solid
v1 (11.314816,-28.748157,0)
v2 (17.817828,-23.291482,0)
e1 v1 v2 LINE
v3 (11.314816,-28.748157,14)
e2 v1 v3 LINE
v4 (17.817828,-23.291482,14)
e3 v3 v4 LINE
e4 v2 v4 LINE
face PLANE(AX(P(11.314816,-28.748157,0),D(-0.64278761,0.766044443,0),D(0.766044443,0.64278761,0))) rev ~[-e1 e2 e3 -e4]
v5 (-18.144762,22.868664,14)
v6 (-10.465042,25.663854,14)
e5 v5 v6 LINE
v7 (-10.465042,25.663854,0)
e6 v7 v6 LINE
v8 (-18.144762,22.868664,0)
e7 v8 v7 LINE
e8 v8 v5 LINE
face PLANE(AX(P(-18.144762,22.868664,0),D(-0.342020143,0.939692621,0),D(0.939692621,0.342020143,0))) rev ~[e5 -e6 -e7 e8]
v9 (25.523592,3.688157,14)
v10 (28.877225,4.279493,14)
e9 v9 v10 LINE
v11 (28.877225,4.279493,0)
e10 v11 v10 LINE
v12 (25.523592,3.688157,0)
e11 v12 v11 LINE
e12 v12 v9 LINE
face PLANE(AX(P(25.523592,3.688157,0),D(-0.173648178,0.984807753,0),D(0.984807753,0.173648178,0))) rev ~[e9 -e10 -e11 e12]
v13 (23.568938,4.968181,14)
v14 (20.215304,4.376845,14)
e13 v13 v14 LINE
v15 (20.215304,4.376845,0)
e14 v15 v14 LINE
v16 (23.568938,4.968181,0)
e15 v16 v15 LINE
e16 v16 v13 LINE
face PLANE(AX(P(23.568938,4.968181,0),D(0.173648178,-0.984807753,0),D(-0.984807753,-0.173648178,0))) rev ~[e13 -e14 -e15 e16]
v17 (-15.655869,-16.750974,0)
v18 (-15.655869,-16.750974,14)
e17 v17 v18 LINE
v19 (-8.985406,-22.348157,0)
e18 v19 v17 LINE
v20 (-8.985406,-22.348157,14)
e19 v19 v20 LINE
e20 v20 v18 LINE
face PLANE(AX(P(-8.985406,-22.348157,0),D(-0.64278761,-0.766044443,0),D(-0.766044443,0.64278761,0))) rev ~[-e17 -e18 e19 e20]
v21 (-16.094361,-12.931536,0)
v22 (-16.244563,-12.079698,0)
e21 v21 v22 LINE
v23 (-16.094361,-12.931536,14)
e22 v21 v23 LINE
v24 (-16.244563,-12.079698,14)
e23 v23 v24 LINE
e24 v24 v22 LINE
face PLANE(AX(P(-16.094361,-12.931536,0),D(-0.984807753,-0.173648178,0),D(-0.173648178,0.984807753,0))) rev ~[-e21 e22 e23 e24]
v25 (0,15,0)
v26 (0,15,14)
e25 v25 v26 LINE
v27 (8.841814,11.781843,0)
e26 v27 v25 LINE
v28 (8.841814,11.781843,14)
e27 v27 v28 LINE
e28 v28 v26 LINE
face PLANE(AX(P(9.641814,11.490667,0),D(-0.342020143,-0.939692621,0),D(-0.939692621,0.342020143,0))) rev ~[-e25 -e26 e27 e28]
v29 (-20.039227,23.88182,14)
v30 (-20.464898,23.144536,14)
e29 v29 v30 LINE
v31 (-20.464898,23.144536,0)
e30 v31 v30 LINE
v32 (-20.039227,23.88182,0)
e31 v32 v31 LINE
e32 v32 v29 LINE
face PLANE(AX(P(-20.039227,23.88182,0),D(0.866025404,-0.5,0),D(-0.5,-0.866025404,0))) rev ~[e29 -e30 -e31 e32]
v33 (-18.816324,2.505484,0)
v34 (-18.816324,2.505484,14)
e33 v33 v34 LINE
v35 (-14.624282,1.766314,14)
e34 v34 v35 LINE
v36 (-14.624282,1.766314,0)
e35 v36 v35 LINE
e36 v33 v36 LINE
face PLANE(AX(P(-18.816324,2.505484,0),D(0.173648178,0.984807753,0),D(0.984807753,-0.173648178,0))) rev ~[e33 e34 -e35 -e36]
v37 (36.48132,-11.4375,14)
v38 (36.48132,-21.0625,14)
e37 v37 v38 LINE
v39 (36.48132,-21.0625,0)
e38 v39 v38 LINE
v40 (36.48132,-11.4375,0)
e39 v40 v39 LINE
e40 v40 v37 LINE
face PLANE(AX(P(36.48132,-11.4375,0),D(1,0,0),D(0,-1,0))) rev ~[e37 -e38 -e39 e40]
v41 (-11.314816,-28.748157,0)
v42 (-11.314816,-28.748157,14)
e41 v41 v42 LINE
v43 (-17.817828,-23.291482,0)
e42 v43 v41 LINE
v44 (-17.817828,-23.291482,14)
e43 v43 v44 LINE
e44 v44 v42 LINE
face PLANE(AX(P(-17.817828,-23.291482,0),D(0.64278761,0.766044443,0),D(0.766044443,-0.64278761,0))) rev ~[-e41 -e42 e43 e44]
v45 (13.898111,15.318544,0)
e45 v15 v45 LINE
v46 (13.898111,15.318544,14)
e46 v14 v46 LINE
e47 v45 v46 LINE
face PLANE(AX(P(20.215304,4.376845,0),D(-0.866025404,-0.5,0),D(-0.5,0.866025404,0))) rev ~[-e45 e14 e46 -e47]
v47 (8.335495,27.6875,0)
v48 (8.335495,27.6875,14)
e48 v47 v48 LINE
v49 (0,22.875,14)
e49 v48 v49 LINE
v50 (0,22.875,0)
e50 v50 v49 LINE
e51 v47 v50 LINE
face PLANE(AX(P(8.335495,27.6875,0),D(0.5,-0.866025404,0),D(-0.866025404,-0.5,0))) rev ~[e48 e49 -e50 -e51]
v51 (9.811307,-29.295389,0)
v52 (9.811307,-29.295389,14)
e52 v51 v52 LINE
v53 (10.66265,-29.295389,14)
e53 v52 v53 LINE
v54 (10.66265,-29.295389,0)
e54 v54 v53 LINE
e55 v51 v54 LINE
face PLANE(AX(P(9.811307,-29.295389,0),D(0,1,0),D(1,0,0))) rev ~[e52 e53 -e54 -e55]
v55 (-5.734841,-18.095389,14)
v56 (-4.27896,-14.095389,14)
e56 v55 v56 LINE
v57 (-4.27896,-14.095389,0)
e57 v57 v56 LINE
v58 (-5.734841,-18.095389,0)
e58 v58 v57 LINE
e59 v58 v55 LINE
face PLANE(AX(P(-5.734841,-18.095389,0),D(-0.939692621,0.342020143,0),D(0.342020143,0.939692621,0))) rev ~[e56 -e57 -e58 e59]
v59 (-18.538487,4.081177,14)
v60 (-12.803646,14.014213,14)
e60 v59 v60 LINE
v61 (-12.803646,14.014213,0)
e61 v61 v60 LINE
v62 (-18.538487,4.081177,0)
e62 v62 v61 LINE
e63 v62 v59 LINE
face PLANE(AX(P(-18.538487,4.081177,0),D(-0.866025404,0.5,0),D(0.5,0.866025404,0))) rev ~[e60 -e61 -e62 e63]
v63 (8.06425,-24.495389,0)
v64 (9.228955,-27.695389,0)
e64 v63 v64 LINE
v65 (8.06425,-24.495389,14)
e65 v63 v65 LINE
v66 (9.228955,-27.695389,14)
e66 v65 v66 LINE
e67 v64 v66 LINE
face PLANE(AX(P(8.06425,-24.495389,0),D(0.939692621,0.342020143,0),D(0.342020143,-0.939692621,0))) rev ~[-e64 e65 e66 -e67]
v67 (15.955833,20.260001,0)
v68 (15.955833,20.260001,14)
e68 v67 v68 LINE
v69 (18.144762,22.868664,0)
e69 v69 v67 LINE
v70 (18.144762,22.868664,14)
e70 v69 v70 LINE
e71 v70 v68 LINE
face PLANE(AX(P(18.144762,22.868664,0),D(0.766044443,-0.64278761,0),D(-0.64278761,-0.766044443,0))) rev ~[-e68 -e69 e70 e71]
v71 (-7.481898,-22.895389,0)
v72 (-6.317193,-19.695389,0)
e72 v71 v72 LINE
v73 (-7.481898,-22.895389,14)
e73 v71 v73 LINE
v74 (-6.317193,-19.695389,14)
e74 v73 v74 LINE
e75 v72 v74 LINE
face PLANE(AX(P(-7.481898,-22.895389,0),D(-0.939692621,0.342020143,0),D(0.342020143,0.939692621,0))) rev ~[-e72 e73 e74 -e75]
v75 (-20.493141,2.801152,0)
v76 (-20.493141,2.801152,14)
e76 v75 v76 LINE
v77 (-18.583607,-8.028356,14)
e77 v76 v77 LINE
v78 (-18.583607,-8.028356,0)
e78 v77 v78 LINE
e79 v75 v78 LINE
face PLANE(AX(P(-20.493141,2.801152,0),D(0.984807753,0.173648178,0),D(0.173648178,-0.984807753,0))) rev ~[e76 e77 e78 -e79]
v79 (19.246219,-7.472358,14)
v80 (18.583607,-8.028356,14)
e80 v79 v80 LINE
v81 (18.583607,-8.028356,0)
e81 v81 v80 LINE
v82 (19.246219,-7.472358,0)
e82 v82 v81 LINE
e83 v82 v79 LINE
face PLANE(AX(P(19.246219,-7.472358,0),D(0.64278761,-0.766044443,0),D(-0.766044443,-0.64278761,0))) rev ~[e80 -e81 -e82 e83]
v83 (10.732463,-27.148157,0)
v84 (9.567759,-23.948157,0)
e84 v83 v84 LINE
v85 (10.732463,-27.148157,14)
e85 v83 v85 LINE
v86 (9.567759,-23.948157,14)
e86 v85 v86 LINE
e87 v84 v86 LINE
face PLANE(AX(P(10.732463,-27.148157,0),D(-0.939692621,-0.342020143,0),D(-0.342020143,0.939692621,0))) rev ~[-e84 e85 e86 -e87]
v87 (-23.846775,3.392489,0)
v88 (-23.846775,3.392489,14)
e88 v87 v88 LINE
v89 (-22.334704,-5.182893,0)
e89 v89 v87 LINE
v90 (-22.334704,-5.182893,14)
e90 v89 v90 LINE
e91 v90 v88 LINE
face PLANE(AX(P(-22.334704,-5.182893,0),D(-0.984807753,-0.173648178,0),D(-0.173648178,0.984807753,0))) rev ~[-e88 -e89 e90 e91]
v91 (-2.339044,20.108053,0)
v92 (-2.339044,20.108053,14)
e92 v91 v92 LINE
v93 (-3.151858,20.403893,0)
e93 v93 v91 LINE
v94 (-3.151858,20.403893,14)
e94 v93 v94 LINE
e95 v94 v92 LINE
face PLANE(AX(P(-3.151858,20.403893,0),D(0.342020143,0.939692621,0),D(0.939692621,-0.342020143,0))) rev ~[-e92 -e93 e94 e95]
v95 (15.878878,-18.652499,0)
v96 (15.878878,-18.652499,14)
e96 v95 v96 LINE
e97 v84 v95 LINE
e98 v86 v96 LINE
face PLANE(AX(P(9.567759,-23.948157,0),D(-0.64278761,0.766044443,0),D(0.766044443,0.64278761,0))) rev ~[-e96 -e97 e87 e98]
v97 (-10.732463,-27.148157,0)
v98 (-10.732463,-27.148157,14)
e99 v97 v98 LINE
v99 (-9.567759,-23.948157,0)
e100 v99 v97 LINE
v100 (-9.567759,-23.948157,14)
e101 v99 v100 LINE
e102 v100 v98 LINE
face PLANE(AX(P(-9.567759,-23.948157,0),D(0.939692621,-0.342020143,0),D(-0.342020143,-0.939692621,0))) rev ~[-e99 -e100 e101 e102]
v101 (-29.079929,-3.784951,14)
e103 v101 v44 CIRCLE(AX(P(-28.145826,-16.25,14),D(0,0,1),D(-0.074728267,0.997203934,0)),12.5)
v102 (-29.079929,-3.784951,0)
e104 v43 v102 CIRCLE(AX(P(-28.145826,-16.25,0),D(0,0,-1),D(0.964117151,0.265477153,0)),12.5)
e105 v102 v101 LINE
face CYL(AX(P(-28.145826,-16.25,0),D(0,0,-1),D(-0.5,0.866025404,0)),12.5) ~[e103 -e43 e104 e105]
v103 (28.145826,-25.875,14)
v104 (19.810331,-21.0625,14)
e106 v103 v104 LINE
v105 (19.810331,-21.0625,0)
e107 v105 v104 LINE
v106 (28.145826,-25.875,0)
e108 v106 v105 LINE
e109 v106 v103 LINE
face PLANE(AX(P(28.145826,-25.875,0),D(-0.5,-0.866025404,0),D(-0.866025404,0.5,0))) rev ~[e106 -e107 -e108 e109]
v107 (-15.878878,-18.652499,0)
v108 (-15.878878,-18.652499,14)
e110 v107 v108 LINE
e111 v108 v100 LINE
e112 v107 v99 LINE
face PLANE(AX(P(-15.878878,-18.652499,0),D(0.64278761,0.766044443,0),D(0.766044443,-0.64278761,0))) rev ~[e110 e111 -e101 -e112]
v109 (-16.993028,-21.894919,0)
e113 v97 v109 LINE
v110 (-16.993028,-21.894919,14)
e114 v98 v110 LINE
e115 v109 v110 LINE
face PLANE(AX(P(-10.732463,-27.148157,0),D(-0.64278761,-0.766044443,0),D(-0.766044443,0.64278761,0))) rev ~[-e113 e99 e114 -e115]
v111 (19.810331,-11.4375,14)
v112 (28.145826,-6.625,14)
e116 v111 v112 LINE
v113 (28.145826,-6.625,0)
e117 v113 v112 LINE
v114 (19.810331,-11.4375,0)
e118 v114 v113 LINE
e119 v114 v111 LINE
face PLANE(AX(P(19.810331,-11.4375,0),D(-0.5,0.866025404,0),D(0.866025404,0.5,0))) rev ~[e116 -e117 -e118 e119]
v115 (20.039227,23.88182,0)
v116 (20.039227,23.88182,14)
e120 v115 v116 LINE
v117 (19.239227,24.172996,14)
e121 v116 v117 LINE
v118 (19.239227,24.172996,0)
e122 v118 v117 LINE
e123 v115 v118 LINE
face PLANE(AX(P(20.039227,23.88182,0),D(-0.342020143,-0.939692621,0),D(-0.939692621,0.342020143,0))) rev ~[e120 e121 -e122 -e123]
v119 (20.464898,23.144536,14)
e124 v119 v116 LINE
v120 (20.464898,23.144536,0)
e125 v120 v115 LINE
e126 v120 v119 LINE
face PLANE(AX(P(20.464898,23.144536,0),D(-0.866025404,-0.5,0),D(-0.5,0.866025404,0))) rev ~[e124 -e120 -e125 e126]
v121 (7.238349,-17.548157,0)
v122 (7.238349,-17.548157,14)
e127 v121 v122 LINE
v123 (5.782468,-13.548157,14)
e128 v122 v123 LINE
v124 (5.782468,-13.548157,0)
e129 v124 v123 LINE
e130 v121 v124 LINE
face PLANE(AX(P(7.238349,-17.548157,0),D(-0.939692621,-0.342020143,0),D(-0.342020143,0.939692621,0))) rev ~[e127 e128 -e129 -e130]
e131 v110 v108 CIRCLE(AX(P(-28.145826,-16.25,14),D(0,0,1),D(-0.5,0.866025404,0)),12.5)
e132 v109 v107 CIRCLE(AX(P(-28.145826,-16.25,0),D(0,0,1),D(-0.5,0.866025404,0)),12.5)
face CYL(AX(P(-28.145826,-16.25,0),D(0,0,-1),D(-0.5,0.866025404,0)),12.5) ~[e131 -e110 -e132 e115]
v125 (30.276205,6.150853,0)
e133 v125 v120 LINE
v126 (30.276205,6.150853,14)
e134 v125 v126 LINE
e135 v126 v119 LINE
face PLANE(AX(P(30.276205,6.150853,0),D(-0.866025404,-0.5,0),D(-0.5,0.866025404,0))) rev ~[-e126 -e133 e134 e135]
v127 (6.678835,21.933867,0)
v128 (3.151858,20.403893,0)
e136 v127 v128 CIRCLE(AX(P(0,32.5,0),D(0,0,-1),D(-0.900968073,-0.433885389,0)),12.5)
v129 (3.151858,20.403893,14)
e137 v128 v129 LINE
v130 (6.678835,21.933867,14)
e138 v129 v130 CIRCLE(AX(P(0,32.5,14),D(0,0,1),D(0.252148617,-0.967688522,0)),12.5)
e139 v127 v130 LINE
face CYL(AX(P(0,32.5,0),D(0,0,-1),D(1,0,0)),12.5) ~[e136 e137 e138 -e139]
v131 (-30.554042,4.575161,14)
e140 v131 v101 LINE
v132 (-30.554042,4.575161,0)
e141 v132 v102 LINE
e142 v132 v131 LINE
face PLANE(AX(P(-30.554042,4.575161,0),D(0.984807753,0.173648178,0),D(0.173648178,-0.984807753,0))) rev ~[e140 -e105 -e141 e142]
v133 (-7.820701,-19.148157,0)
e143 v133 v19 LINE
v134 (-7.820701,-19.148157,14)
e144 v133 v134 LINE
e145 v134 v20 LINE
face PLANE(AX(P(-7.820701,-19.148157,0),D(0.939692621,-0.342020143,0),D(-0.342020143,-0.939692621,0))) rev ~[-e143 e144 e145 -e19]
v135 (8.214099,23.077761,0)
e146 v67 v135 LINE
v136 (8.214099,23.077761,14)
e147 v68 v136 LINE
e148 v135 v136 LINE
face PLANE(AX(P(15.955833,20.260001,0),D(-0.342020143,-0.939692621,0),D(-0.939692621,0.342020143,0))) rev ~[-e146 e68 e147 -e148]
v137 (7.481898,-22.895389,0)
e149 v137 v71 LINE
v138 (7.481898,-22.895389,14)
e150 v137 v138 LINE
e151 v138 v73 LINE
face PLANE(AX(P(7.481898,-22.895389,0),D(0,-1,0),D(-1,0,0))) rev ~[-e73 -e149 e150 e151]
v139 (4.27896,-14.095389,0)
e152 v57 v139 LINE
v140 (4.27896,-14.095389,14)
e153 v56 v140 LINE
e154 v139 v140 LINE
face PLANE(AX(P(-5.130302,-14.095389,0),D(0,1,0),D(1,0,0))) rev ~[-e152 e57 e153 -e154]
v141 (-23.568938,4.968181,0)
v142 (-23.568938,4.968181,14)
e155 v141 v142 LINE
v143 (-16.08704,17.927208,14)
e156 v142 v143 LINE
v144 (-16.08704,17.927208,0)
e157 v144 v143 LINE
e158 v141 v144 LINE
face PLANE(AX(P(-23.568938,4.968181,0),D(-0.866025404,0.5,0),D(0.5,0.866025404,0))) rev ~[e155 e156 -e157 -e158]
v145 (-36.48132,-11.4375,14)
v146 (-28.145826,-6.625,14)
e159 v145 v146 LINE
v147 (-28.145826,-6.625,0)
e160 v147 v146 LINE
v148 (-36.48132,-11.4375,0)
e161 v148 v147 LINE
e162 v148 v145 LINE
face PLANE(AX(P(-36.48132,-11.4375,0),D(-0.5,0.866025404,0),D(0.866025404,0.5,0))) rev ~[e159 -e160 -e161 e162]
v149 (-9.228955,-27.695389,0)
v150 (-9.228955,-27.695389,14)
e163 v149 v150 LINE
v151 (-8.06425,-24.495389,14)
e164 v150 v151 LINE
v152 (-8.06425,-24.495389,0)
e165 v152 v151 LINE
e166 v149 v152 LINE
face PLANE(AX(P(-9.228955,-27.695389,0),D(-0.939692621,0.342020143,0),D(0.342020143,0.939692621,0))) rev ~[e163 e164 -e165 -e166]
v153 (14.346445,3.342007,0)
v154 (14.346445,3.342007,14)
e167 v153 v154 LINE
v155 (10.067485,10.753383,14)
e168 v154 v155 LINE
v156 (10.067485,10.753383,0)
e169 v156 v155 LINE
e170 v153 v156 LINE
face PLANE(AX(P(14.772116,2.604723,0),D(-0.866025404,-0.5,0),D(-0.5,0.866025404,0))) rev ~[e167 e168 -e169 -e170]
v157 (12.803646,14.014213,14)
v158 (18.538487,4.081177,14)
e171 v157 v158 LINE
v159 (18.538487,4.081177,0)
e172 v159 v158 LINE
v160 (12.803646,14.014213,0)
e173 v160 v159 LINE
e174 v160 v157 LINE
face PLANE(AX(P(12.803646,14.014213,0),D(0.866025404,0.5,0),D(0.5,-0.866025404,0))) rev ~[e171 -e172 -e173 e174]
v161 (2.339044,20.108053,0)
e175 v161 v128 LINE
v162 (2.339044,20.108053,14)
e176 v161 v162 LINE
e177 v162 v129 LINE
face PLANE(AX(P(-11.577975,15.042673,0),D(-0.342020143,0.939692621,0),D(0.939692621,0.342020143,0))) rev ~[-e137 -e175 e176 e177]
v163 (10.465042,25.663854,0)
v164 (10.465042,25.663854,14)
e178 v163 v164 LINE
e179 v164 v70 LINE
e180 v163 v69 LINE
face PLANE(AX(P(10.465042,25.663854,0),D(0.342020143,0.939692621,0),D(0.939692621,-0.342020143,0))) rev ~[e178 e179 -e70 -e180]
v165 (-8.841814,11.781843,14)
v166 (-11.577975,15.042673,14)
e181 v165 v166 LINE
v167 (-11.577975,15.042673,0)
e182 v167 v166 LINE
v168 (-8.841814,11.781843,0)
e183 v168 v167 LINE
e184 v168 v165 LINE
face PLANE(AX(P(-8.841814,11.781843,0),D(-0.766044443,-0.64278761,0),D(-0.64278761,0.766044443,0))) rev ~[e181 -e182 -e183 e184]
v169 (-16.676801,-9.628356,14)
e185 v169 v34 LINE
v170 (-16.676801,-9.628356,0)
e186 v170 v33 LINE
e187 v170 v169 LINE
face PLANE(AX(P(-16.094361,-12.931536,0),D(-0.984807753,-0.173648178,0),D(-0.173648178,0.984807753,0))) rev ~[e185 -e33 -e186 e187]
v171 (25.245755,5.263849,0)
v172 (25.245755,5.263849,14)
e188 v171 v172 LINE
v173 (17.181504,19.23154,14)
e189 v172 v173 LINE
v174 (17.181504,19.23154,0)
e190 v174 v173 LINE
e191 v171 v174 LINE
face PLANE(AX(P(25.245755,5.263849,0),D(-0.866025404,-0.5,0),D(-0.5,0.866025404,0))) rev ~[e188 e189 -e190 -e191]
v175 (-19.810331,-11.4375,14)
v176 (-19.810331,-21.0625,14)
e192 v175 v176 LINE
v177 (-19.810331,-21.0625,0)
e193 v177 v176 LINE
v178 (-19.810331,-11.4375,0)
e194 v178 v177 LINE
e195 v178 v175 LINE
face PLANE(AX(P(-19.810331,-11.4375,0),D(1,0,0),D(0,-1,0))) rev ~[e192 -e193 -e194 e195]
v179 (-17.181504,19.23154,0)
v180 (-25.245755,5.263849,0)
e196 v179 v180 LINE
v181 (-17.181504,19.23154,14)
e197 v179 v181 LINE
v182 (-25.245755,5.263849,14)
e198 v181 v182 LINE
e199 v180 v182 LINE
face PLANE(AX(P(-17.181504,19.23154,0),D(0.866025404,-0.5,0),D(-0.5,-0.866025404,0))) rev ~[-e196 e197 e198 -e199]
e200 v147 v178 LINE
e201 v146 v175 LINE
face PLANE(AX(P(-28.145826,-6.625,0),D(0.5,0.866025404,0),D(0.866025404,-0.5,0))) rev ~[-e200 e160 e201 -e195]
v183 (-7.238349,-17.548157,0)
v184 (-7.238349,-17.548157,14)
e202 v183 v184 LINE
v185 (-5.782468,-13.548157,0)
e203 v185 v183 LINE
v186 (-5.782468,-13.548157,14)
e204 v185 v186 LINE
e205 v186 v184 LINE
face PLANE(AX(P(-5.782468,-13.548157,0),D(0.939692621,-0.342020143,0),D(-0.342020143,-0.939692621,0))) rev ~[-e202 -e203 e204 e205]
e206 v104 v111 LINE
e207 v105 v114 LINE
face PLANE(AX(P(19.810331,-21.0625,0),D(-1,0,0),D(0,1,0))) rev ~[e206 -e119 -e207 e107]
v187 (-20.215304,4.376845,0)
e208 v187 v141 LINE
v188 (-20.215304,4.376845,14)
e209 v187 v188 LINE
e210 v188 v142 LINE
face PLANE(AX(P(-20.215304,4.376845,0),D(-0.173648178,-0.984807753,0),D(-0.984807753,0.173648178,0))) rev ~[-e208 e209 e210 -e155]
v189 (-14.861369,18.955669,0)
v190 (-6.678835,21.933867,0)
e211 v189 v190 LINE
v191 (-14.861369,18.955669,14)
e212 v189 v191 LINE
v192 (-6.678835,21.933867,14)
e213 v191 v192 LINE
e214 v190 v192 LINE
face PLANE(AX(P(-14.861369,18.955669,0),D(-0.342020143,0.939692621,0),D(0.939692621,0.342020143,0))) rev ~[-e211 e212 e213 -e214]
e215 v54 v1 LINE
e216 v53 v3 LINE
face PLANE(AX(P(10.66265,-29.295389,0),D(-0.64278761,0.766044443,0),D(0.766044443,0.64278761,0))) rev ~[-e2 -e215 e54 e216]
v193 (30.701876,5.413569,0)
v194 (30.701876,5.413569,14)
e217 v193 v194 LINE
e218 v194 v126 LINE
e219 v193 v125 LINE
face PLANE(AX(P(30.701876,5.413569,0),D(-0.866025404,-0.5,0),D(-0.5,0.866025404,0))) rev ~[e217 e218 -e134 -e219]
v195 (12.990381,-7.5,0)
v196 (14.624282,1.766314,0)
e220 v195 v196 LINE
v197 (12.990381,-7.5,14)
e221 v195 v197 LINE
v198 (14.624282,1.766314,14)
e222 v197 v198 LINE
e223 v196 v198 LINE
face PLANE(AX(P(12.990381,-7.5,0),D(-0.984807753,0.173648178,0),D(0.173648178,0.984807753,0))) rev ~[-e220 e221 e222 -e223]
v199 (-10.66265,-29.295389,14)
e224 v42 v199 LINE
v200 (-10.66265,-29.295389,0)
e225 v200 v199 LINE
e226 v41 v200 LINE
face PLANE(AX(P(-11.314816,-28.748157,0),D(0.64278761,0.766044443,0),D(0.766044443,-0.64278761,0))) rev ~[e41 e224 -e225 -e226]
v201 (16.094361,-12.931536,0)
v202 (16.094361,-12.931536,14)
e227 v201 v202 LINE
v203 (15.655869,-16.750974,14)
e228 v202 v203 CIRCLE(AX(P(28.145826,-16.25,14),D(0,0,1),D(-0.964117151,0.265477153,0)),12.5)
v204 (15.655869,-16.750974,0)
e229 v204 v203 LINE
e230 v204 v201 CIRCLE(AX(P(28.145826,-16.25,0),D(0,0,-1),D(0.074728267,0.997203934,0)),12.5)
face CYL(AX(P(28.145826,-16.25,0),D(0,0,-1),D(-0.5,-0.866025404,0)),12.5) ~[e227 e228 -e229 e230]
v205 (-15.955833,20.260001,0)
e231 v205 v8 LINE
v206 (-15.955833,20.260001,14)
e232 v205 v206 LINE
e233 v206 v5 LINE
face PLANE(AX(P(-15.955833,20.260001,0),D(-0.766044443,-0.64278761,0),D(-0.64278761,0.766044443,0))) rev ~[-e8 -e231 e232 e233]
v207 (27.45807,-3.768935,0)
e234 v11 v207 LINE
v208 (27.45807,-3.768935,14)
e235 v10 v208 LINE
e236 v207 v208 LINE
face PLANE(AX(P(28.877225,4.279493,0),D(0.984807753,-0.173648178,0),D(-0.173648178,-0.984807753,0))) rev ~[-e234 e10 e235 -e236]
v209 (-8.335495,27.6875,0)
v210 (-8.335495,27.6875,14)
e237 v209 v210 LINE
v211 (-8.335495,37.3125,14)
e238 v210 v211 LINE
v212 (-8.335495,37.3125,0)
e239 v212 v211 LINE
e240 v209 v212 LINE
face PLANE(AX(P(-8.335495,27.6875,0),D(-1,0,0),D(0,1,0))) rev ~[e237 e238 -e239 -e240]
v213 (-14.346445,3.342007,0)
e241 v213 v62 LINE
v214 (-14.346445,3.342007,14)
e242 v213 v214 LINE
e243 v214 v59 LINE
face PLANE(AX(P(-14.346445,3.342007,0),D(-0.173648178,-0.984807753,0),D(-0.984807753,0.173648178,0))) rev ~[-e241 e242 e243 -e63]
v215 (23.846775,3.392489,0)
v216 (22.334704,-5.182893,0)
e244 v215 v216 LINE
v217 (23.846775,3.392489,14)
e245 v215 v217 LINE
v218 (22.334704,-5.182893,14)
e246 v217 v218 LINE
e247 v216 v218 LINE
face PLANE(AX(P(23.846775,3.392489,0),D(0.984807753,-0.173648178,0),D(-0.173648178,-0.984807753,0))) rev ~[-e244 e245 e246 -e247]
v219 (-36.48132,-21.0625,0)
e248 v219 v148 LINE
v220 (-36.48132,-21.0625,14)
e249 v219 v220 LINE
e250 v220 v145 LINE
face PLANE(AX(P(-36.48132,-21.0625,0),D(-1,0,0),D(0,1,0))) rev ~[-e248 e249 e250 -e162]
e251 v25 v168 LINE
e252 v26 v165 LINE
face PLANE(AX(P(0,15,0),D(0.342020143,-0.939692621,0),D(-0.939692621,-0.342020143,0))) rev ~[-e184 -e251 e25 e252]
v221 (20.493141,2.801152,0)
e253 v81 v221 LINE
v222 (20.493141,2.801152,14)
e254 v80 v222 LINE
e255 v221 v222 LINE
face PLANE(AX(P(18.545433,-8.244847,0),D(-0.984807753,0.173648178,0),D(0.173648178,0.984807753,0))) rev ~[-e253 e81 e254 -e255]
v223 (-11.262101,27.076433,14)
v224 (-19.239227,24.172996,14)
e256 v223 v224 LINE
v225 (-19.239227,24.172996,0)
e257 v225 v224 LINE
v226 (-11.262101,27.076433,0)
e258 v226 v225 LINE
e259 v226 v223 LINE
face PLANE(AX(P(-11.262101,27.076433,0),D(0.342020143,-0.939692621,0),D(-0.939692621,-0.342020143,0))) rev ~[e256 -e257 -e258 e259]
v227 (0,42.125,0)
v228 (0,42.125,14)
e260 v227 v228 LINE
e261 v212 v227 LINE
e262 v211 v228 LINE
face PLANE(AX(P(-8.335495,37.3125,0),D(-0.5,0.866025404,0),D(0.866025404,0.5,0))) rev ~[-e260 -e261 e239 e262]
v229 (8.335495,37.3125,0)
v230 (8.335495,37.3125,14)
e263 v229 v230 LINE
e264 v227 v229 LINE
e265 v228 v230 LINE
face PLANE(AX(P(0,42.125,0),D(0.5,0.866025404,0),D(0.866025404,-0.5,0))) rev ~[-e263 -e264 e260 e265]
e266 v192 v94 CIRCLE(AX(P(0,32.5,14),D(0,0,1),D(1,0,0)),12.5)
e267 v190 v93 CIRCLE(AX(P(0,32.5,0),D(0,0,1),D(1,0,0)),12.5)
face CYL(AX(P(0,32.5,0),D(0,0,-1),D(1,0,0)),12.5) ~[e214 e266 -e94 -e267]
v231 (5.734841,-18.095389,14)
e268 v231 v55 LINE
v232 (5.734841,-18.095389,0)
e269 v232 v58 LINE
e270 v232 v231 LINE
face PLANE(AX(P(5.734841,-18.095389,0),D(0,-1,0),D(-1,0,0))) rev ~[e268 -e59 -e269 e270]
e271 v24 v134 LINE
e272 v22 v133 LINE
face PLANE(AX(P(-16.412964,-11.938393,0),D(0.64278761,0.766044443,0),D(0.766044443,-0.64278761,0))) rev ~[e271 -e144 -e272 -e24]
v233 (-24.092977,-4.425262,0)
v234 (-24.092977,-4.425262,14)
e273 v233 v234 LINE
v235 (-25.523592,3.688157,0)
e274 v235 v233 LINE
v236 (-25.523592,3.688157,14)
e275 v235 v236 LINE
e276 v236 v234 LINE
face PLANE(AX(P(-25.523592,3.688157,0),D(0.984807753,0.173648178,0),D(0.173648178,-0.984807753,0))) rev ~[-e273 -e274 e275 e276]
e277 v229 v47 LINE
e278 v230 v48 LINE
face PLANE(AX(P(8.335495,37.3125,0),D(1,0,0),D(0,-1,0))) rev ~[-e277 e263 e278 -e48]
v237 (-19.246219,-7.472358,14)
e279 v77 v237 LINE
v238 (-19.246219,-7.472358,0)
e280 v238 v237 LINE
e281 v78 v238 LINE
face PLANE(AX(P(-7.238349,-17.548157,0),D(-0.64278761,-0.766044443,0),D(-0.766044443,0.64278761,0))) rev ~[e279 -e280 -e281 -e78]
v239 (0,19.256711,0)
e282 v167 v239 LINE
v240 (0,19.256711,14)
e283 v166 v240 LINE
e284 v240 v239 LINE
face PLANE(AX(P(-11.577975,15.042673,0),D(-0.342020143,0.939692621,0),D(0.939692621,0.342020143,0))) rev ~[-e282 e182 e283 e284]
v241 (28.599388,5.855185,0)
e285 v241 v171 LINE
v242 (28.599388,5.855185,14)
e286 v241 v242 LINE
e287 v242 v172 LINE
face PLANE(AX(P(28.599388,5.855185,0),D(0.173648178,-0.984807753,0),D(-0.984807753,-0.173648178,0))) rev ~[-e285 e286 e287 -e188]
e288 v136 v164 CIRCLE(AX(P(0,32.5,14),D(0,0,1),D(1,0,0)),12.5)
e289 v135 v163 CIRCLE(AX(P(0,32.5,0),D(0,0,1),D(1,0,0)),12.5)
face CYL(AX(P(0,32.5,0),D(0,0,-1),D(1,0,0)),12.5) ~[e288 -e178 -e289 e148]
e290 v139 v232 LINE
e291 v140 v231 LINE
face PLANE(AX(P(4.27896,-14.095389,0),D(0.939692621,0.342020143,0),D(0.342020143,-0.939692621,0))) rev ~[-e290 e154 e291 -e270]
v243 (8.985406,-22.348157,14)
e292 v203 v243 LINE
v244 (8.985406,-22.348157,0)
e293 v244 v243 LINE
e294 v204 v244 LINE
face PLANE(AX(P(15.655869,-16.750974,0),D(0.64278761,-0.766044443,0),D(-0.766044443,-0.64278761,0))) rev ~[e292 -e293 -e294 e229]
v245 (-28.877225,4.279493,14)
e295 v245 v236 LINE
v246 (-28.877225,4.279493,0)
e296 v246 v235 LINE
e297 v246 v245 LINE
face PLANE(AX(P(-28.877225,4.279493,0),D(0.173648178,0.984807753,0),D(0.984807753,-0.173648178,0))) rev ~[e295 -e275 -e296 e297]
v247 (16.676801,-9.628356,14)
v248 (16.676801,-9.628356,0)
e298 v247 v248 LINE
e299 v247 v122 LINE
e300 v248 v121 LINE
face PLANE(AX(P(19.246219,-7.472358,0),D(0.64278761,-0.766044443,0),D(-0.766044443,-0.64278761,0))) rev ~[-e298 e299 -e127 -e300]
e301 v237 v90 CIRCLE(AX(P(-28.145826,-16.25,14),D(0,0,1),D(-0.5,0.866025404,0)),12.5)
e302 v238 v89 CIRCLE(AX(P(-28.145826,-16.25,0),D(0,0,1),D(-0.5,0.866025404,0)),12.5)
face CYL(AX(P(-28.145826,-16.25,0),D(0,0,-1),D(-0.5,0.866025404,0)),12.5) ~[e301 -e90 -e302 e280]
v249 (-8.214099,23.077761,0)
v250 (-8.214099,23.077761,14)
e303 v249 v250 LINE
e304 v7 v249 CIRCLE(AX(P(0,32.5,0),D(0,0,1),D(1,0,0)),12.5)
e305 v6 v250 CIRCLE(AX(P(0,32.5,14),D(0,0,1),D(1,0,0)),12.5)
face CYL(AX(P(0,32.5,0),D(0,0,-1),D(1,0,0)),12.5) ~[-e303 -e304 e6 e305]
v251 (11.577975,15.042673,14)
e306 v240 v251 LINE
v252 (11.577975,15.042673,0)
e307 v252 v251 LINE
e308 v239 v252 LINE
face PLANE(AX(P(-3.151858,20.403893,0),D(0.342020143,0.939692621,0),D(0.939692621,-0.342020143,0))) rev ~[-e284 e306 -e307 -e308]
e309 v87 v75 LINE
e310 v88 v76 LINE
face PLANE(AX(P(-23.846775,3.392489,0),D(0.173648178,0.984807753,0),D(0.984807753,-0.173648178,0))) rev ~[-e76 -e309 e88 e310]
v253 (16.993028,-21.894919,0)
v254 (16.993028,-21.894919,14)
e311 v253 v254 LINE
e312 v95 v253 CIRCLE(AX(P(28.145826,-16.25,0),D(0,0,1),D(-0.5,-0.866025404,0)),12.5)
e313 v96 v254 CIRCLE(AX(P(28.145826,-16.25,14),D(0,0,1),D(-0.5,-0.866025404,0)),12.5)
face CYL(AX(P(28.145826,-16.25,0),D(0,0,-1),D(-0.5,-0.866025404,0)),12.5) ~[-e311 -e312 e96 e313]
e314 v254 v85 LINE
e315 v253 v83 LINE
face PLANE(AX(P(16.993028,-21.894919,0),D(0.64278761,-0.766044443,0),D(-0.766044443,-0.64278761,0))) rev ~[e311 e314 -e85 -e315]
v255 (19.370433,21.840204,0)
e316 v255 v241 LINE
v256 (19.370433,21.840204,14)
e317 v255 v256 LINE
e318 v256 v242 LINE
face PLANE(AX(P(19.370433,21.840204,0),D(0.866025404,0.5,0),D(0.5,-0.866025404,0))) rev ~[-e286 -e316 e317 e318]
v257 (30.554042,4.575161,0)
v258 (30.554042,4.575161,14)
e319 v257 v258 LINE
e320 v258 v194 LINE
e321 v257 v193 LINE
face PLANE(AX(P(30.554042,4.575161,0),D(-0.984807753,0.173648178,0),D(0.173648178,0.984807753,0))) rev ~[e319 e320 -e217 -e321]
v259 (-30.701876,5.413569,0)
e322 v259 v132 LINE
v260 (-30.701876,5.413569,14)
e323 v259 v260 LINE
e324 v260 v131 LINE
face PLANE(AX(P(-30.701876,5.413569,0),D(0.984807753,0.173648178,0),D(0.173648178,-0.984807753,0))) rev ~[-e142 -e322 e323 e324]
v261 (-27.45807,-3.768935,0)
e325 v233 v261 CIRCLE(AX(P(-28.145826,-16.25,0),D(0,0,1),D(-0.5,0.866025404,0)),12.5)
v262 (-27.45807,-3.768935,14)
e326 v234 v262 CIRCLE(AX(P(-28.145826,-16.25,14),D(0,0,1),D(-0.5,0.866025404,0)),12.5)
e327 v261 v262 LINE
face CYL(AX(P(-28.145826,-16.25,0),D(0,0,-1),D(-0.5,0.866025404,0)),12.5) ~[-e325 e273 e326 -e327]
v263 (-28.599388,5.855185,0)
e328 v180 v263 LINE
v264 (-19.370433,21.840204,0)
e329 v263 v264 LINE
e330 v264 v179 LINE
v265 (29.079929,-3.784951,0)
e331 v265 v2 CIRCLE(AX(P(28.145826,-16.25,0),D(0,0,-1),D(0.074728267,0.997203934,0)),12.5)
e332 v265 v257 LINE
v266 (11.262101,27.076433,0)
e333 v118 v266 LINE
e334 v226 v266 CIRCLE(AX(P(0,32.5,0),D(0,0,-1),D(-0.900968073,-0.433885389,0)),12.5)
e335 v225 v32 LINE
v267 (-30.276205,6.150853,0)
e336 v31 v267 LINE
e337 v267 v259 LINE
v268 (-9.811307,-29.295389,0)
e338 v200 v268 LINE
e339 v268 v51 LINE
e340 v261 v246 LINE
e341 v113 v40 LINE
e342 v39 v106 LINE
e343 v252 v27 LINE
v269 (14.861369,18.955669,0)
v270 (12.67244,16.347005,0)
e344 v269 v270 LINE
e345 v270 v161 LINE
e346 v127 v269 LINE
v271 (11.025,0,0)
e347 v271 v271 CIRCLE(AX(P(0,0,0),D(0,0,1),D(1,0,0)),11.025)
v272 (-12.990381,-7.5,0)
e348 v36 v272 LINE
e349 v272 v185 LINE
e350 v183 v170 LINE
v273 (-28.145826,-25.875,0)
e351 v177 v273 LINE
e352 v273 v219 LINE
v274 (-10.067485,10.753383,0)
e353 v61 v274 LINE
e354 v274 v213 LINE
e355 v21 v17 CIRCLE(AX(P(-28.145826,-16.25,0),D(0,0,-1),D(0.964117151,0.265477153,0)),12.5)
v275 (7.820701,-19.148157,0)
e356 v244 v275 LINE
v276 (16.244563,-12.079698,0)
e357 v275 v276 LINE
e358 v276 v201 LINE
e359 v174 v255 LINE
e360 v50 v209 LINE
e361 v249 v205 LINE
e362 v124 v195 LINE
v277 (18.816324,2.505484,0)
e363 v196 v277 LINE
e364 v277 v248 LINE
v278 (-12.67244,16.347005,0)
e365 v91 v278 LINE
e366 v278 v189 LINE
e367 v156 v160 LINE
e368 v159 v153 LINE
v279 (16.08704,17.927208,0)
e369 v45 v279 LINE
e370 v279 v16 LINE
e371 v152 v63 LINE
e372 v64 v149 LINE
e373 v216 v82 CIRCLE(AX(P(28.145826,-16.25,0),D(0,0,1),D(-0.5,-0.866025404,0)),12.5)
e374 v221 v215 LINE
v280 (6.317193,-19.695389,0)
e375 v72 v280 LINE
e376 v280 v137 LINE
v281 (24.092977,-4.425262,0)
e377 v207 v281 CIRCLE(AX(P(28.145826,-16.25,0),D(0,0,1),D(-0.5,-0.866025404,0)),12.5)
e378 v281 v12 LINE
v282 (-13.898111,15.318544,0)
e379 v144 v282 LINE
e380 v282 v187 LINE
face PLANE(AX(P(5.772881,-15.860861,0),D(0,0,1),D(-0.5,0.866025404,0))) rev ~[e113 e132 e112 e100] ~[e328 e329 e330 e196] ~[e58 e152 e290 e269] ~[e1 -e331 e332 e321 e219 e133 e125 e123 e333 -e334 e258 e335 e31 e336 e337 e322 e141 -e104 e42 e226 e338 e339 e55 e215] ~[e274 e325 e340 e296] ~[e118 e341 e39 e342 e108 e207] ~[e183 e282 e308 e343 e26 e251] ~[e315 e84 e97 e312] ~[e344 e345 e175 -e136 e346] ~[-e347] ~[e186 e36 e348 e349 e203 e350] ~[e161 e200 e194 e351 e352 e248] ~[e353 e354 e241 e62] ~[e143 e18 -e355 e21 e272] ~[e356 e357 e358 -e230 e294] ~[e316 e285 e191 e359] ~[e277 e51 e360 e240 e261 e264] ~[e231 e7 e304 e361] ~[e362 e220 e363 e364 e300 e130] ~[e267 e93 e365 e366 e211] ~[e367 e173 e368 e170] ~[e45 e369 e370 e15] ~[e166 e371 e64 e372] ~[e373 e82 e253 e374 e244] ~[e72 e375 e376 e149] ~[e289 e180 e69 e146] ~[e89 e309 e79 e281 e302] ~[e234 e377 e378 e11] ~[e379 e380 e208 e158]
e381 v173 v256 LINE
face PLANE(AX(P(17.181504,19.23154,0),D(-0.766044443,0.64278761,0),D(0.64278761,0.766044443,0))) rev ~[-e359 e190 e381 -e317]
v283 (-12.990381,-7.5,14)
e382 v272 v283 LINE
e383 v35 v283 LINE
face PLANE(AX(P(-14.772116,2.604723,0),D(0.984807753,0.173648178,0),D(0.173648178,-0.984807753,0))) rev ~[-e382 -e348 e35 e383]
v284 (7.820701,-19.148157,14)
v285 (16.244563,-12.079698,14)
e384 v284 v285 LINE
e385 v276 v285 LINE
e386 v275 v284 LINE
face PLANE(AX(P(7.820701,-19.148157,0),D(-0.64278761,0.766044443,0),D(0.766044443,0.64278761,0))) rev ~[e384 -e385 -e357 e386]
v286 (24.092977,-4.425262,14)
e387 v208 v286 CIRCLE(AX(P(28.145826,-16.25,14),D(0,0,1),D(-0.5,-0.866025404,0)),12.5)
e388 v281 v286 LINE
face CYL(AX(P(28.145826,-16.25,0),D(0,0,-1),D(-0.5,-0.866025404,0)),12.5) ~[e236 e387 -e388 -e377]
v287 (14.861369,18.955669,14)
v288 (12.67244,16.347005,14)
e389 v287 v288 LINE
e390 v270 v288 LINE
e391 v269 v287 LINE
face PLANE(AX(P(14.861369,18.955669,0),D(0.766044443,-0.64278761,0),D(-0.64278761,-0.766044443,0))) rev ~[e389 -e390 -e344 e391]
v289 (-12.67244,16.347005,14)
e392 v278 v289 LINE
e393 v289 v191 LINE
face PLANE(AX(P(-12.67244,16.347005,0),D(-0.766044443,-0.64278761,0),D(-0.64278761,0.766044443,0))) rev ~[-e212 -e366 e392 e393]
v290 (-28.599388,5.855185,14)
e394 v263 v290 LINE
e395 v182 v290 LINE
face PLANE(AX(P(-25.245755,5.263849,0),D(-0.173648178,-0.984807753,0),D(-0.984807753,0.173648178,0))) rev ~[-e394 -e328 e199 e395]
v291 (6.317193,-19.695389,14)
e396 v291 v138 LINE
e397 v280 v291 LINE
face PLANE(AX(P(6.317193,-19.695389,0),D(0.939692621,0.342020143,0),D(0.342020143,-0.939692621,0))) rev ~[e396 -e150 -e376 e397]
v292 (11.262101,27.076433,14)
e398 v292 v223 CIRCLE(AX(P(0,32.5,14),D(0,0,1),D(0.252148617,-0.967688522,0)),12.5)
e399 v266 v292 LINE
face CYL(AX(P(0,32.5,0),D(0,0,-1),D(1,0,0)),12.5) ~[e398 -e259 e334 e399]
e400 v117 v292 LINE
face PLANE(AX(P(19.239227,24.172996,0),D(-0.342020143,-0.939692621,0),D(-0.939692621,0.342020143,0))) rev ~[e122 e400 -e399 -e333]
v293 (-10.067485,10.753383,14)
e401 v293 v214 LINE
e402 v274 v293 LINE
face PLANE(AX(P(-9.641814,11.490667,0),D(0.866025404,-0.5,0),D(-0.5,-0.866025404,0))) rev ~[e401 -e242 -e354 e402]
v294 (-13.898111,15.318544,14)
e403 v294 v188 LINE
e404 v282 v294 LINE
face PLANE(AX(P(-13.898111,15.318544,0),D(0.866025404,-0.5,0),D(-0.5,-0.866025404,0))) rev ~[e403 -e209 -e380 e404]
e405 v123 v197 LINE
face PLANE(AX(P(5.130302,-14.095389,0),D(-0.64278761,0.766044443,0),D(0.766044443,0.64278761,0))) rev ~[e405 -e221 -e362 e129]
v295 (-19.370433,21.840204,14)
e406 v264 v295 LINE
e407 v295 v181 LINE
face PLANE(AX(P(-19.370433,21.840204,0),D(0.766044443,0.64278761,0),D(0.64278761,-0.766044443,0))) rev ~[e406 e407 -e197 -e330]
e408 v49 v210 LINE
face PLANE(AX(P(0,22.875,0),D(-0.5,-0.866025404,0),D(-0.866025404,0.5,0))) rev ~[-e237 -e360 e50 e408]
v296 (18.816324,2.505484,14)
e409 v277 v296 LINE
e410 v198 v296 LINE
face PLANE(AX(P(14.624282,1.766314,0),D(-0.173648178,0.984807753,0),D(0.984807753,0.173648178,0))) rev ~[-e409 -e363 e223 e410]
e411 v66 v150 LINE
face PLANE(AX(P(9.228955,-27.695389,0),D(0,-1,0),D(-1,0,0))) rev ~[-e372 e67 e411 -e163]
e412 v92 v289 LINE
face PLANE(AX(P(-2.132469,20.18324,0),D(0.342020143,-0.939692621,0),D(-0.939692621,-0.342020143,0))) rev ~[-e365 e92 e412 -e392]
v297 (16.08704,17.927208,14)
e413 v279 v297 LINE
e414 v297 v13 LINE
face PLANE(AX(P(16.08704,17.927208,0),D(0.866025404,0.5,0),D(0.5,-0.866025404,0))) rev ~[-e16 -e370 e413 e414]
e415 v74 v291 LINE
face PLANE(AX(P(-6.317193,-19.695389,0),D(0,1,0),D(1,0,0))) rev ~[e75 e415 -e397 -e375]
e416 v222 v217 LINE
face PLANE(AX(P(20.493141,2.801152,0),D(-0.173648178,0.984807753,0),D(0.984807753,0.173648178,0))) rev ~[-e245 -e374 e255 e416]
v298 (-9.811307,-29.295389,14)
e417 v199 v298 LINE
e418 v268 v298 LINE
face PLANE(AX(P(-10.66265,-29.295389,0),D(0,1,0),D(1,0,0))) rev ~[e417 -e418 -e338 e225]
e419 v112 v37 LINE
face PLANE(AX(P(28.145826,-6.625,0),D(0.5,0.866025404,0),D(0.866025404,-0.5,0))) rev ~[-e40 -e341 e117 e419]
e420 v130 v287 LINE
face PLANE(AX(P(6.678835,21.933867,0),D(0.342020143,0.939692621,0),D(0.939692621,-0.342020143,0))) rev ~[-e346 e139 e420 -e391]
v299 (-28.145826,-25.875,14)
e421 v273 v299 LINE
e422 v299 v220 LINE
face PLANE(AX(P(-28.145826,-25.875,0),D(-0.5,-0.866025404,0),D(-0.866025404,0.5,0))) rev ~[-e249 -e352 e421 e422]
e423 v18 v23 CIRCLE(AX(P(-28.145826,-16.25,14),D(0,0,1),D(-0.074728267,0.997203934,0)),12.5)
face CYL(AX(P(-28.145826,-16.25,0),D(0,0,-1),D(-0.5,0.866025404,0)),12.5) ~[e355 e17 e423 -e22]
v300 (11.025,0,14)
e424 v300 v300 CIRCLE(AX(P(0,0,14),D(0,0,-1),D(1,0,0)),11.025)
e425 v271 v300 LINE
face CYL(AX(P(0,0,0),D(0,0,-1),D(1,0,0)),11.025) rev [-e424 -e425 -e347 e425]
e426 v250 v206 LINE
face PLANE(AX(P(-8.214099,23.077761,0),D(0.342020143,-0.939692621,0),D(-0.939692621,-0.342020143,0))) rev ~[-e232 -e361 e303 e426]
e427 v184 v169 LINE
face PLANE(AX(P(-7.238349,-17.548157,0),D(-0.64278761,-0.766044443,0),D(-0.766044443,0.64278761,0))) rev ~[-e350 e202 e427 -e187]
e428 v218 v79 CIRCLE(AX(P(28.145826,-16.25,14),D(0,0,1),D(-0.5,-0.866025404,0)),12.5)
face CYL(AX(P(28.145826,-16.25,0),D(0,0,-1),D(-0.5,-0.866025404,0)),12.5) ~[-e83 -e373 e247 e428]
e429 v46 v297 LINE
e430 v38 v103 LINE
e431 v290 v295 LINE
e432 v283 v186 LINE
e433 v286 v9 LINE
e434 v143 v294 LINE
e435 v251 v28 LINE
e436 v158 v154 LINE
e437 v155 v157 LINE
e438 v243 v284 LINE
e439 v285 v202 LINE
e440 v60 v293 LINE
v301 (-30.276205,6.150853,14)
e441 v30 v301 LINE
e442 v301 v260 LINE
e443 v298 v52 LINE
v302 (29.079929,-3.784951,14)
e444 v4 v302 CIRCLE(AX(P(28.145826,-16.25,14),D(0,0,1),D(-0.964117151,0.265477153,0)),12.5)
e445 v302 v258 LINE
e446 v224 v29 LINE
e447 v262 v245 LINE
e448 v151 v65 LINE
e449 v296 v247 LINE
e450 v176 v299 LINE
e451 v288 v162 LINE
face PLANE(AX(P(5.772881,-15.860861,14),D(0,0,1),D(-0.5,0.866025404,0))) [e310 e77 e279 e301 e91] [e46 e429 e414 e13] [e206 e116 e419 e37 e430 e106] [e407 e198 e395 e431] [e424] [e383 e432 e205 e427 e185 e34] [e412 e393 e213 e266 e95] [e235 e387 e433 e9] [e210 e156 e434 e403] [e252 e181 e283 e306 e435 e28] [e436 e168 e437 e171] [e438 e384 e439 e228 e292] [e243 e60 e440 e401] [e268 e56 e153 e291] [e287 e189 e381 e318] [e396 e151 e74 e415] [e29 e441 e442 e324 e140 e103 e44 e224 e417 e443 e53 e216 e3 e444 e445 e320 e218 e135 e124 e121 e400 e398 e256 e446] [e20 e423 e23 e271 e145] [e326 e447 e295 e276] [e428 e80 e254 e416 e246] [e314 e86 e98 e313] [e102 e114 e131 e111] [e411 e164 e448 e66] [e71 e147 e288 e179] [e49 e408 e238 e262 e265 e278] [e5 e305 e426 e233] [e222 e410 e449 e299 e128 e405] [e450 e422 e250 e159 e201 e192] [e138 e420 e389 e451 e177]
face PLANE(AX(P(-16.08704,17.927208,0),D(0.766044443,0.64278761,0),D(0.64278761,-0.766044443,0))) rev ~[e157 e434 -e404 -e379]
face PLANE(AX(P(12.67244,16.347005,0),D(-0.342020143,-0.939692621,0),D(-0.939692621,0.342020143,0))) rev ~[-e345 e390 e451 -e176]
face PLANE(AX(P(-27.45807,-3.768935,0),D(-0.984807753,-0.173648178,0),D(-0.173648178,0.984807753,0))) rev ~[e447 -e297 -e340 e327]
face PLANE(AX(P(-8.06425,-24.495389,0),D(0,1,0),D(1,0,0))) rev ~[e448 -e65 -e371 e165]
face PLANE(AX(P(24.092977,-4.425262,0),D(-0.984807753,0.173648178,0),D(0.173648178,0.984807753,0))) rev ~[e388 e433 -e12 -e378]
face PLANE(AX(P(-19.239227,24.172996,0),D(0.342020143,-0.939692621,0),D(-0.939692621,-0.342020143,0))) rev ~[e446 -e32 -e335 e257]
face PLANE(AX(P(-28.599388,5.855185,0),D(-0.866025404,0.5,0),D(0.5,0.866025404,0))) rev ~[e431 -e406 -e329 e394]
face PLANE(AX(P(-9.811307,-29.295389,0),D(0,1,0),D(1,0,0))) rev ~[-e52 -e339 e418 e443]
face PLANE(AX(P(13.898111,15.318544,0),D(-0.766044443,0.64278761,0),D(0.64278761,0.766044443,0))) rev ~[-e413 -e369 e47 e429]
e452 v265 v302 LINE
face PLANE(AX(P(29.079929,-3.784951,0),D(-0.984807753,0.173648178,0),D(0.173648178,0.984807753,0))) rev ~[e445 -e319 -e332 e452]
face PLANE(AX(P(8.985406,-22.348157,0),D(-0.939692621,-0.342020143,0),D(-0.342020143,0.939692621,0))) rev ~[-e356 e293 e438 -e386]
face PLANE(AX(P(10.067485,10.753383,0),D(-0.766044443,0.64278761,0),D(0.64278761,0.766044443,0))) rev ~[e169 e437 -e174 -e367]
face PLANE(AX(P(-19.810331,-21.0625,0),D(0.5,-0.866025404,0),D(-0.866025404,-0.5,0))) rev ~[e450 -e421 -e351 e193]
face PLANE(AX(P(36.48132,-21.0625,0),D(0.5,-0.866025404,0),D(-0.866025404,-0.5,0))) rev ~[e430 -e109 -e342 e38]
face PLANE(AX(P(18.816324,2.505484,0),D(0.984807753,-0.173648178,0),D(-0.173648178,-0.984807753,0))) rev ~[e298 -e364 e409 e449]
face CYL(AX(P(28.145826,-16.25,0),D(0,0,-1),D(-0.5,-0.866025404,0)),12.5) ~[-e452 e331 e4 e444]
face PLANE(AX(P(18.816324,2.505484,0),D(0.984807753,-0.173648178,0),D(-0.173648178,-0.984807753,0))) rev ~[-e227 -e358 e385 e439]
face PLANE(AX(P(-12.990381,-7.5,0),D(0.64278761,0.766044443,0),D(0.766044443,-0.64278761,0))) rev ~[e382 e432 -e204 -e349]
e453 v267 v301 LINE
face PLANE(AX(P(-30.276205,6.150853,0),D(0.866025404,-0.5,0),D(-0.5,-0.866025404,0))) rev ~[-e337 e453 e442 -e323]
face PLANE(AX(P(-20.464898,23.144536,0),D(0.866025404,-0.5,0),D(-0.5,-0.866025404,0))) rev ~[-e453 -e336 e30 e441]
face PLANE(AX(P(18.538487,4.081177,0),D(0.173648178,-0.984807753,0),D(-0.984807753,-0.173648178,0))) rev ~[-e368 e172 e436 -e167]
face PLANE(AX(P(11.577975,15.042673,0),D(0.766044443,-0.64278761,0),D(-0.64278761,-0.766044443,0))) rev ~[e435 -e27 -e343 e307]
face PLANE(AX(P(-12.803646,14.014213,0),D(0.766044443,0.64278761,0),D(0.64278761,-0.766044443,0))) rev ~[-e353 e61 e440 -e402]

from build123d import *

# Parameters (mm, degrees)
F0_R     = 12.5
F1_DEPTH = 14
F0_R_2   = 11.025
F2_COUNT = 3
F4_DEPTH = 14
F5_COUNT = 3


# Not quite as in the source:
# - a feature names something its author has since deleted; it is built from what else it names


with BuildPart() as f1:
    # F0 (on Top) → F1 (new body)
    with BuildSketch(Plane.XY):
        with Locations((0, 32.5)):
            Circle(F0_R)
        Polygon((8.3354945114, 37.3125), (8.3354945114, 27.6875), (0, 22.875), (-8.3354945114, 27.6875), (-8.3354945114, 37.3125), (0, 42.125), align=None, mode=Mode.SUBTRACT)
    extrude(amount=F1_DEPTH)


with BuildPart() as f1b:
    # F0 (on Top) → F1, piece 2 (new body)
    with BuildSketch(Plane.XY):
        Polygon((9.6418141453, 11.4906666468), (0, 15), (-9.6418141453, 11.4906666468), (-14.7721162952, 2.604722665), (-12.9903810568, -7.5), (-5.1303021499, -14.0953893118), (5.1303021499, -14.0953893118), (12.9903810568, -7.5), (14.7721162952, 2.604722665), align=None)
        Circle(F0_R_2, mode=Mode.SUBTRACT)
    extrude(amount=F1_DEPTH)


with BuildPart() as f2_1:
    # F2: instance of F1
    add(f1.part.rotate(Axis((0, 0, 0), (0, 0, -1)), 1 * 360 / F2_COUNT))


with BuildPart() as f2_2:
    # F2: instance of F1
    add(f1.part.rotate(Axis((0, 0, 0), (0, 0, -1)), 2 * 360 / F2_COUNT))


with BuildPart() as f1_1:
    add(f1.part)

    add(f1b.part)  # F4 merges F1b

    add(f2_2.part)  # F4 merges F2_2
    # F3 (on Top) → F4 (join, through all)
    with BuildSketch(Plane.XY):
        Polygon((-14.3464451862, 3.3420066531), (-18.5384872699, 4.0811767767), (-18.9641583789, 3.3438927886), (-18.8163243541, 2.5054843719), (-14.6242822705, 1.7663142483), (-14.7721162952, 2.604722665), align=None)
        Polygon((-8.8418141453, 11.7818428342), (-11.5779752919, 15.0426727106), (-12.3779752919, 14.7514965232), (-12.8036464009, 14.0142125351), (-10.0674852543, 10.7533826587), (-9.6418141453, 11.4906666468), align=None)
        Polygon((-18.9641583789, 3.3438927886), (-18.5384872699, 4.0811767767), (-20.2153041033, 4.3768448262), (-20.6409752123, 3.6395608381), (-20.4931411876, 2.8011524213), (-18.8163243541, 2.5054843719), align=None)
        Polygon((-12.3779752919, 14.7514965232), (-11.5779752919, 15.0426727106), (-12.6724397505, 16.3470046611), (-13.4724397505, 16.0558284737), (-13.8981108595, 15.3185444856), (-12.8036464009, 14.0142125351), align=None)
        Polygon((-13.4724397505, 16.0558284737), (-12.6724397505, 16.3470046611), (-14.8613686678, 18.9556685622), (-15.6613686678, 18.6644923748), (-16.0870397768, 17.9272083867), (-13.8981108595, 15.3185444856), align=None)
        Polygon((-20.6409752123, 3.6395608381), (-20.2153041033, 4.3768448262), (-23.5689377703, 4.968180925), (-23.9946088793, 4.230896937), (-23.8467748545, 3.3924885202), (-20.4931411876, 2.8011524213), align=None)
        Polygon((-23.5689377703, 4.968180925), (-25.2457546037, 5.2638489745), (-25.6714257127, 4.5265649864), (-25.523591688, 3.6881565697), (-23.8467748545, 3.3924885202), (-23.9946088793, 4.230896937), align=None)
        Polygon((-14.8613686678, 18.9556685622), (-15.9558331265, 20.2600005128), (-16.7558331265, 19.9688243254), (-17.1815042355, 19.2315403373), (-16.0870397768, 17.9272083867), (-15.6613686678, 18.6644923748), align=None)
        Polygon((-15.9558331265, 20.2600005128), (-18.1447620438, 22.8686644139), (-18.9447620438, 22.5774882265), (-19.3704331527, 21.8402042384), (-17.1815042355, 19.2315403373), (-16.7558331265, 19.9688243254), align=None)
        Polygon((-25.2457546037, 5.2638489745), (-28.5993882707, 5.8551850734), (-29.0250593797, 5.1179010853), (-28.8772253549, 4.2794926686), (-25.523591688, 3.6881565697), (-25.6714257127, 4.5265649864), align=None)
        Polygon((-28.5993882707, 5.8551850734), (-30.2762051041, 6.1508531228), (-30.7018762131, 5.4135691347), (-30.5540421884, 4.575160718), (-28.8772253549, 4.2794926686), (-29.0250593797, 5.1179010853), align=None)
        Polygon((-18.1447620438, 22.8686644139), (-19.2392265024, 24.1729963645), (-20.0392265024, 23.881820177), (-20.4648976114, 23.144536189), (-19.3704331527, 21.8402042384), (-18.9447620438, 22.5774882265), align=None)
        with BuildLine():
            ThreePointArc((-10.4650421032, 25.6638538798), (-10.8865068143, 26.3572018279), (-11.262100915, 27.0764326333))
            Line((-11.262100915, 27.0764326333), (-19.2392265024, 24.1729963645))
            Line((-19.2392265024, 24.1729963645), (-18.1447620438, 22.8686644139))
            Line((-18.1447620438, 22.8686644139), (-10.4650421032, 25.6638538798))
        make_face()
        Polygon((-19.3704331527, 21.8402042384), (-20.4648976114, 23.144536189), (-30.2762051041, 6.1508531228), (-28.5993882707, 5.8551850734), align=None)
        Polygon((-16.0870397768, 17.9272083867), (-17.1815042355, 19.2315403373), (-25.2457546037, 5.2638489745), (-23.5689377703, 4.968180925), align=None)
        with BuildLine():
            ThreePointArc((-6.6788350915, 21.9338672249), (-7.4683996582, 22.4763775737), (-8.2140988038, 23.0777613678))
            Line((-8.2140988038, 23.0777613678), (-15.9558331265, 20.2600005128))
            Line((-15.9558331265, 20.2600005128), (-14.8613686678, 18.9556685622))
            Line((-14.8613686678, 18.9556685622), (-6.6788350915, 21.9338672249))
        make_face()
        with BuildLine():
            Line((-11.5779752919, 15.0426727106), (3.1518577067, 20.4038934778))
            ThreePointArc((3.1518577067, 20.4038934778), (0.5214979159, 20.0108831408), (-2.1324694589, 20.1832401173))
            Line((-2.1324694589, 20.1832401173), (-12.6724397505, 16.3470046611))
            Line((-12.6724397505, 16.3470046611), (-11.5779752919, 15.0426727106))
        make_face()
        Polygon((-18.5384872699, 4.0811767767), (-12.8036464009, 14.0142125351), (-13.8981108595, 15.3185444856), (-20.2153041033, 4.3768448262), align=None)
        with BuildLine():
            Line((-28.8772253549, 4.2794926686), (-30.5540421884, 4.575160718))
            Line((-30.5540421884, 4.575160718), (-29.0799289618, -3.7849508243))
            ThreePointArc((-29.0799289618, -3.7849508243), (-28.2692597628, -3.7506094543), (-27.4580704705, -3.7689346268))
            Line((-27.4580704705, -3.7689346268), (-28.8772253549, 4.2794926686))
        make_face()
        with BuildLine():
            Line((-23.8467748545, 3.3924885202), (-25.523591688, 3.6881565697))
            Line((-25.523591688, 3.6881565697), (-24.0929770089, -4.4252624506))
            ThreePointArc((-24.0929770089, -4.4252624506), (-23.199313793, -4.7703649572), (-22.3347037658, -5.1828927555))
            Line((-22.3347037658, -5.1828927555), (-23.8467748545, 3.3924885202))
        make_face()
        with BuildLine():
            Line((-16.0943612345, -12.931535582), (-18.8163243541, 2.5054843719))
            Line((-18.8163243541, 2.5054843719), (-20.4931411876, 2.8011524213))
            Line((-20.4931411876, 2.8011524213), (-18.5454334017, -8.2448473345))
            ThreePointArc((-18.5454334017, -8.2448473345), (-17.0691841941, -10.4570720136), (-16.0943612345, -12.931535582))
        make_face()
    extrude(amount=F4_DEPTH)



with BuildPart() as f1_2:
    add(f1_1.part)

    add(f2_1.part)  # F5 merges F2_1
    # F5: F1 ×3 about axis
    f5_axis = Axis((0, 0, 0), (0, 0, -1))
    for i in range(1, F5_COUNT):
        add(f1_1.part.rotate(f5_axis, i * 360 / F5_COUNT))


solid = f1_2.part
